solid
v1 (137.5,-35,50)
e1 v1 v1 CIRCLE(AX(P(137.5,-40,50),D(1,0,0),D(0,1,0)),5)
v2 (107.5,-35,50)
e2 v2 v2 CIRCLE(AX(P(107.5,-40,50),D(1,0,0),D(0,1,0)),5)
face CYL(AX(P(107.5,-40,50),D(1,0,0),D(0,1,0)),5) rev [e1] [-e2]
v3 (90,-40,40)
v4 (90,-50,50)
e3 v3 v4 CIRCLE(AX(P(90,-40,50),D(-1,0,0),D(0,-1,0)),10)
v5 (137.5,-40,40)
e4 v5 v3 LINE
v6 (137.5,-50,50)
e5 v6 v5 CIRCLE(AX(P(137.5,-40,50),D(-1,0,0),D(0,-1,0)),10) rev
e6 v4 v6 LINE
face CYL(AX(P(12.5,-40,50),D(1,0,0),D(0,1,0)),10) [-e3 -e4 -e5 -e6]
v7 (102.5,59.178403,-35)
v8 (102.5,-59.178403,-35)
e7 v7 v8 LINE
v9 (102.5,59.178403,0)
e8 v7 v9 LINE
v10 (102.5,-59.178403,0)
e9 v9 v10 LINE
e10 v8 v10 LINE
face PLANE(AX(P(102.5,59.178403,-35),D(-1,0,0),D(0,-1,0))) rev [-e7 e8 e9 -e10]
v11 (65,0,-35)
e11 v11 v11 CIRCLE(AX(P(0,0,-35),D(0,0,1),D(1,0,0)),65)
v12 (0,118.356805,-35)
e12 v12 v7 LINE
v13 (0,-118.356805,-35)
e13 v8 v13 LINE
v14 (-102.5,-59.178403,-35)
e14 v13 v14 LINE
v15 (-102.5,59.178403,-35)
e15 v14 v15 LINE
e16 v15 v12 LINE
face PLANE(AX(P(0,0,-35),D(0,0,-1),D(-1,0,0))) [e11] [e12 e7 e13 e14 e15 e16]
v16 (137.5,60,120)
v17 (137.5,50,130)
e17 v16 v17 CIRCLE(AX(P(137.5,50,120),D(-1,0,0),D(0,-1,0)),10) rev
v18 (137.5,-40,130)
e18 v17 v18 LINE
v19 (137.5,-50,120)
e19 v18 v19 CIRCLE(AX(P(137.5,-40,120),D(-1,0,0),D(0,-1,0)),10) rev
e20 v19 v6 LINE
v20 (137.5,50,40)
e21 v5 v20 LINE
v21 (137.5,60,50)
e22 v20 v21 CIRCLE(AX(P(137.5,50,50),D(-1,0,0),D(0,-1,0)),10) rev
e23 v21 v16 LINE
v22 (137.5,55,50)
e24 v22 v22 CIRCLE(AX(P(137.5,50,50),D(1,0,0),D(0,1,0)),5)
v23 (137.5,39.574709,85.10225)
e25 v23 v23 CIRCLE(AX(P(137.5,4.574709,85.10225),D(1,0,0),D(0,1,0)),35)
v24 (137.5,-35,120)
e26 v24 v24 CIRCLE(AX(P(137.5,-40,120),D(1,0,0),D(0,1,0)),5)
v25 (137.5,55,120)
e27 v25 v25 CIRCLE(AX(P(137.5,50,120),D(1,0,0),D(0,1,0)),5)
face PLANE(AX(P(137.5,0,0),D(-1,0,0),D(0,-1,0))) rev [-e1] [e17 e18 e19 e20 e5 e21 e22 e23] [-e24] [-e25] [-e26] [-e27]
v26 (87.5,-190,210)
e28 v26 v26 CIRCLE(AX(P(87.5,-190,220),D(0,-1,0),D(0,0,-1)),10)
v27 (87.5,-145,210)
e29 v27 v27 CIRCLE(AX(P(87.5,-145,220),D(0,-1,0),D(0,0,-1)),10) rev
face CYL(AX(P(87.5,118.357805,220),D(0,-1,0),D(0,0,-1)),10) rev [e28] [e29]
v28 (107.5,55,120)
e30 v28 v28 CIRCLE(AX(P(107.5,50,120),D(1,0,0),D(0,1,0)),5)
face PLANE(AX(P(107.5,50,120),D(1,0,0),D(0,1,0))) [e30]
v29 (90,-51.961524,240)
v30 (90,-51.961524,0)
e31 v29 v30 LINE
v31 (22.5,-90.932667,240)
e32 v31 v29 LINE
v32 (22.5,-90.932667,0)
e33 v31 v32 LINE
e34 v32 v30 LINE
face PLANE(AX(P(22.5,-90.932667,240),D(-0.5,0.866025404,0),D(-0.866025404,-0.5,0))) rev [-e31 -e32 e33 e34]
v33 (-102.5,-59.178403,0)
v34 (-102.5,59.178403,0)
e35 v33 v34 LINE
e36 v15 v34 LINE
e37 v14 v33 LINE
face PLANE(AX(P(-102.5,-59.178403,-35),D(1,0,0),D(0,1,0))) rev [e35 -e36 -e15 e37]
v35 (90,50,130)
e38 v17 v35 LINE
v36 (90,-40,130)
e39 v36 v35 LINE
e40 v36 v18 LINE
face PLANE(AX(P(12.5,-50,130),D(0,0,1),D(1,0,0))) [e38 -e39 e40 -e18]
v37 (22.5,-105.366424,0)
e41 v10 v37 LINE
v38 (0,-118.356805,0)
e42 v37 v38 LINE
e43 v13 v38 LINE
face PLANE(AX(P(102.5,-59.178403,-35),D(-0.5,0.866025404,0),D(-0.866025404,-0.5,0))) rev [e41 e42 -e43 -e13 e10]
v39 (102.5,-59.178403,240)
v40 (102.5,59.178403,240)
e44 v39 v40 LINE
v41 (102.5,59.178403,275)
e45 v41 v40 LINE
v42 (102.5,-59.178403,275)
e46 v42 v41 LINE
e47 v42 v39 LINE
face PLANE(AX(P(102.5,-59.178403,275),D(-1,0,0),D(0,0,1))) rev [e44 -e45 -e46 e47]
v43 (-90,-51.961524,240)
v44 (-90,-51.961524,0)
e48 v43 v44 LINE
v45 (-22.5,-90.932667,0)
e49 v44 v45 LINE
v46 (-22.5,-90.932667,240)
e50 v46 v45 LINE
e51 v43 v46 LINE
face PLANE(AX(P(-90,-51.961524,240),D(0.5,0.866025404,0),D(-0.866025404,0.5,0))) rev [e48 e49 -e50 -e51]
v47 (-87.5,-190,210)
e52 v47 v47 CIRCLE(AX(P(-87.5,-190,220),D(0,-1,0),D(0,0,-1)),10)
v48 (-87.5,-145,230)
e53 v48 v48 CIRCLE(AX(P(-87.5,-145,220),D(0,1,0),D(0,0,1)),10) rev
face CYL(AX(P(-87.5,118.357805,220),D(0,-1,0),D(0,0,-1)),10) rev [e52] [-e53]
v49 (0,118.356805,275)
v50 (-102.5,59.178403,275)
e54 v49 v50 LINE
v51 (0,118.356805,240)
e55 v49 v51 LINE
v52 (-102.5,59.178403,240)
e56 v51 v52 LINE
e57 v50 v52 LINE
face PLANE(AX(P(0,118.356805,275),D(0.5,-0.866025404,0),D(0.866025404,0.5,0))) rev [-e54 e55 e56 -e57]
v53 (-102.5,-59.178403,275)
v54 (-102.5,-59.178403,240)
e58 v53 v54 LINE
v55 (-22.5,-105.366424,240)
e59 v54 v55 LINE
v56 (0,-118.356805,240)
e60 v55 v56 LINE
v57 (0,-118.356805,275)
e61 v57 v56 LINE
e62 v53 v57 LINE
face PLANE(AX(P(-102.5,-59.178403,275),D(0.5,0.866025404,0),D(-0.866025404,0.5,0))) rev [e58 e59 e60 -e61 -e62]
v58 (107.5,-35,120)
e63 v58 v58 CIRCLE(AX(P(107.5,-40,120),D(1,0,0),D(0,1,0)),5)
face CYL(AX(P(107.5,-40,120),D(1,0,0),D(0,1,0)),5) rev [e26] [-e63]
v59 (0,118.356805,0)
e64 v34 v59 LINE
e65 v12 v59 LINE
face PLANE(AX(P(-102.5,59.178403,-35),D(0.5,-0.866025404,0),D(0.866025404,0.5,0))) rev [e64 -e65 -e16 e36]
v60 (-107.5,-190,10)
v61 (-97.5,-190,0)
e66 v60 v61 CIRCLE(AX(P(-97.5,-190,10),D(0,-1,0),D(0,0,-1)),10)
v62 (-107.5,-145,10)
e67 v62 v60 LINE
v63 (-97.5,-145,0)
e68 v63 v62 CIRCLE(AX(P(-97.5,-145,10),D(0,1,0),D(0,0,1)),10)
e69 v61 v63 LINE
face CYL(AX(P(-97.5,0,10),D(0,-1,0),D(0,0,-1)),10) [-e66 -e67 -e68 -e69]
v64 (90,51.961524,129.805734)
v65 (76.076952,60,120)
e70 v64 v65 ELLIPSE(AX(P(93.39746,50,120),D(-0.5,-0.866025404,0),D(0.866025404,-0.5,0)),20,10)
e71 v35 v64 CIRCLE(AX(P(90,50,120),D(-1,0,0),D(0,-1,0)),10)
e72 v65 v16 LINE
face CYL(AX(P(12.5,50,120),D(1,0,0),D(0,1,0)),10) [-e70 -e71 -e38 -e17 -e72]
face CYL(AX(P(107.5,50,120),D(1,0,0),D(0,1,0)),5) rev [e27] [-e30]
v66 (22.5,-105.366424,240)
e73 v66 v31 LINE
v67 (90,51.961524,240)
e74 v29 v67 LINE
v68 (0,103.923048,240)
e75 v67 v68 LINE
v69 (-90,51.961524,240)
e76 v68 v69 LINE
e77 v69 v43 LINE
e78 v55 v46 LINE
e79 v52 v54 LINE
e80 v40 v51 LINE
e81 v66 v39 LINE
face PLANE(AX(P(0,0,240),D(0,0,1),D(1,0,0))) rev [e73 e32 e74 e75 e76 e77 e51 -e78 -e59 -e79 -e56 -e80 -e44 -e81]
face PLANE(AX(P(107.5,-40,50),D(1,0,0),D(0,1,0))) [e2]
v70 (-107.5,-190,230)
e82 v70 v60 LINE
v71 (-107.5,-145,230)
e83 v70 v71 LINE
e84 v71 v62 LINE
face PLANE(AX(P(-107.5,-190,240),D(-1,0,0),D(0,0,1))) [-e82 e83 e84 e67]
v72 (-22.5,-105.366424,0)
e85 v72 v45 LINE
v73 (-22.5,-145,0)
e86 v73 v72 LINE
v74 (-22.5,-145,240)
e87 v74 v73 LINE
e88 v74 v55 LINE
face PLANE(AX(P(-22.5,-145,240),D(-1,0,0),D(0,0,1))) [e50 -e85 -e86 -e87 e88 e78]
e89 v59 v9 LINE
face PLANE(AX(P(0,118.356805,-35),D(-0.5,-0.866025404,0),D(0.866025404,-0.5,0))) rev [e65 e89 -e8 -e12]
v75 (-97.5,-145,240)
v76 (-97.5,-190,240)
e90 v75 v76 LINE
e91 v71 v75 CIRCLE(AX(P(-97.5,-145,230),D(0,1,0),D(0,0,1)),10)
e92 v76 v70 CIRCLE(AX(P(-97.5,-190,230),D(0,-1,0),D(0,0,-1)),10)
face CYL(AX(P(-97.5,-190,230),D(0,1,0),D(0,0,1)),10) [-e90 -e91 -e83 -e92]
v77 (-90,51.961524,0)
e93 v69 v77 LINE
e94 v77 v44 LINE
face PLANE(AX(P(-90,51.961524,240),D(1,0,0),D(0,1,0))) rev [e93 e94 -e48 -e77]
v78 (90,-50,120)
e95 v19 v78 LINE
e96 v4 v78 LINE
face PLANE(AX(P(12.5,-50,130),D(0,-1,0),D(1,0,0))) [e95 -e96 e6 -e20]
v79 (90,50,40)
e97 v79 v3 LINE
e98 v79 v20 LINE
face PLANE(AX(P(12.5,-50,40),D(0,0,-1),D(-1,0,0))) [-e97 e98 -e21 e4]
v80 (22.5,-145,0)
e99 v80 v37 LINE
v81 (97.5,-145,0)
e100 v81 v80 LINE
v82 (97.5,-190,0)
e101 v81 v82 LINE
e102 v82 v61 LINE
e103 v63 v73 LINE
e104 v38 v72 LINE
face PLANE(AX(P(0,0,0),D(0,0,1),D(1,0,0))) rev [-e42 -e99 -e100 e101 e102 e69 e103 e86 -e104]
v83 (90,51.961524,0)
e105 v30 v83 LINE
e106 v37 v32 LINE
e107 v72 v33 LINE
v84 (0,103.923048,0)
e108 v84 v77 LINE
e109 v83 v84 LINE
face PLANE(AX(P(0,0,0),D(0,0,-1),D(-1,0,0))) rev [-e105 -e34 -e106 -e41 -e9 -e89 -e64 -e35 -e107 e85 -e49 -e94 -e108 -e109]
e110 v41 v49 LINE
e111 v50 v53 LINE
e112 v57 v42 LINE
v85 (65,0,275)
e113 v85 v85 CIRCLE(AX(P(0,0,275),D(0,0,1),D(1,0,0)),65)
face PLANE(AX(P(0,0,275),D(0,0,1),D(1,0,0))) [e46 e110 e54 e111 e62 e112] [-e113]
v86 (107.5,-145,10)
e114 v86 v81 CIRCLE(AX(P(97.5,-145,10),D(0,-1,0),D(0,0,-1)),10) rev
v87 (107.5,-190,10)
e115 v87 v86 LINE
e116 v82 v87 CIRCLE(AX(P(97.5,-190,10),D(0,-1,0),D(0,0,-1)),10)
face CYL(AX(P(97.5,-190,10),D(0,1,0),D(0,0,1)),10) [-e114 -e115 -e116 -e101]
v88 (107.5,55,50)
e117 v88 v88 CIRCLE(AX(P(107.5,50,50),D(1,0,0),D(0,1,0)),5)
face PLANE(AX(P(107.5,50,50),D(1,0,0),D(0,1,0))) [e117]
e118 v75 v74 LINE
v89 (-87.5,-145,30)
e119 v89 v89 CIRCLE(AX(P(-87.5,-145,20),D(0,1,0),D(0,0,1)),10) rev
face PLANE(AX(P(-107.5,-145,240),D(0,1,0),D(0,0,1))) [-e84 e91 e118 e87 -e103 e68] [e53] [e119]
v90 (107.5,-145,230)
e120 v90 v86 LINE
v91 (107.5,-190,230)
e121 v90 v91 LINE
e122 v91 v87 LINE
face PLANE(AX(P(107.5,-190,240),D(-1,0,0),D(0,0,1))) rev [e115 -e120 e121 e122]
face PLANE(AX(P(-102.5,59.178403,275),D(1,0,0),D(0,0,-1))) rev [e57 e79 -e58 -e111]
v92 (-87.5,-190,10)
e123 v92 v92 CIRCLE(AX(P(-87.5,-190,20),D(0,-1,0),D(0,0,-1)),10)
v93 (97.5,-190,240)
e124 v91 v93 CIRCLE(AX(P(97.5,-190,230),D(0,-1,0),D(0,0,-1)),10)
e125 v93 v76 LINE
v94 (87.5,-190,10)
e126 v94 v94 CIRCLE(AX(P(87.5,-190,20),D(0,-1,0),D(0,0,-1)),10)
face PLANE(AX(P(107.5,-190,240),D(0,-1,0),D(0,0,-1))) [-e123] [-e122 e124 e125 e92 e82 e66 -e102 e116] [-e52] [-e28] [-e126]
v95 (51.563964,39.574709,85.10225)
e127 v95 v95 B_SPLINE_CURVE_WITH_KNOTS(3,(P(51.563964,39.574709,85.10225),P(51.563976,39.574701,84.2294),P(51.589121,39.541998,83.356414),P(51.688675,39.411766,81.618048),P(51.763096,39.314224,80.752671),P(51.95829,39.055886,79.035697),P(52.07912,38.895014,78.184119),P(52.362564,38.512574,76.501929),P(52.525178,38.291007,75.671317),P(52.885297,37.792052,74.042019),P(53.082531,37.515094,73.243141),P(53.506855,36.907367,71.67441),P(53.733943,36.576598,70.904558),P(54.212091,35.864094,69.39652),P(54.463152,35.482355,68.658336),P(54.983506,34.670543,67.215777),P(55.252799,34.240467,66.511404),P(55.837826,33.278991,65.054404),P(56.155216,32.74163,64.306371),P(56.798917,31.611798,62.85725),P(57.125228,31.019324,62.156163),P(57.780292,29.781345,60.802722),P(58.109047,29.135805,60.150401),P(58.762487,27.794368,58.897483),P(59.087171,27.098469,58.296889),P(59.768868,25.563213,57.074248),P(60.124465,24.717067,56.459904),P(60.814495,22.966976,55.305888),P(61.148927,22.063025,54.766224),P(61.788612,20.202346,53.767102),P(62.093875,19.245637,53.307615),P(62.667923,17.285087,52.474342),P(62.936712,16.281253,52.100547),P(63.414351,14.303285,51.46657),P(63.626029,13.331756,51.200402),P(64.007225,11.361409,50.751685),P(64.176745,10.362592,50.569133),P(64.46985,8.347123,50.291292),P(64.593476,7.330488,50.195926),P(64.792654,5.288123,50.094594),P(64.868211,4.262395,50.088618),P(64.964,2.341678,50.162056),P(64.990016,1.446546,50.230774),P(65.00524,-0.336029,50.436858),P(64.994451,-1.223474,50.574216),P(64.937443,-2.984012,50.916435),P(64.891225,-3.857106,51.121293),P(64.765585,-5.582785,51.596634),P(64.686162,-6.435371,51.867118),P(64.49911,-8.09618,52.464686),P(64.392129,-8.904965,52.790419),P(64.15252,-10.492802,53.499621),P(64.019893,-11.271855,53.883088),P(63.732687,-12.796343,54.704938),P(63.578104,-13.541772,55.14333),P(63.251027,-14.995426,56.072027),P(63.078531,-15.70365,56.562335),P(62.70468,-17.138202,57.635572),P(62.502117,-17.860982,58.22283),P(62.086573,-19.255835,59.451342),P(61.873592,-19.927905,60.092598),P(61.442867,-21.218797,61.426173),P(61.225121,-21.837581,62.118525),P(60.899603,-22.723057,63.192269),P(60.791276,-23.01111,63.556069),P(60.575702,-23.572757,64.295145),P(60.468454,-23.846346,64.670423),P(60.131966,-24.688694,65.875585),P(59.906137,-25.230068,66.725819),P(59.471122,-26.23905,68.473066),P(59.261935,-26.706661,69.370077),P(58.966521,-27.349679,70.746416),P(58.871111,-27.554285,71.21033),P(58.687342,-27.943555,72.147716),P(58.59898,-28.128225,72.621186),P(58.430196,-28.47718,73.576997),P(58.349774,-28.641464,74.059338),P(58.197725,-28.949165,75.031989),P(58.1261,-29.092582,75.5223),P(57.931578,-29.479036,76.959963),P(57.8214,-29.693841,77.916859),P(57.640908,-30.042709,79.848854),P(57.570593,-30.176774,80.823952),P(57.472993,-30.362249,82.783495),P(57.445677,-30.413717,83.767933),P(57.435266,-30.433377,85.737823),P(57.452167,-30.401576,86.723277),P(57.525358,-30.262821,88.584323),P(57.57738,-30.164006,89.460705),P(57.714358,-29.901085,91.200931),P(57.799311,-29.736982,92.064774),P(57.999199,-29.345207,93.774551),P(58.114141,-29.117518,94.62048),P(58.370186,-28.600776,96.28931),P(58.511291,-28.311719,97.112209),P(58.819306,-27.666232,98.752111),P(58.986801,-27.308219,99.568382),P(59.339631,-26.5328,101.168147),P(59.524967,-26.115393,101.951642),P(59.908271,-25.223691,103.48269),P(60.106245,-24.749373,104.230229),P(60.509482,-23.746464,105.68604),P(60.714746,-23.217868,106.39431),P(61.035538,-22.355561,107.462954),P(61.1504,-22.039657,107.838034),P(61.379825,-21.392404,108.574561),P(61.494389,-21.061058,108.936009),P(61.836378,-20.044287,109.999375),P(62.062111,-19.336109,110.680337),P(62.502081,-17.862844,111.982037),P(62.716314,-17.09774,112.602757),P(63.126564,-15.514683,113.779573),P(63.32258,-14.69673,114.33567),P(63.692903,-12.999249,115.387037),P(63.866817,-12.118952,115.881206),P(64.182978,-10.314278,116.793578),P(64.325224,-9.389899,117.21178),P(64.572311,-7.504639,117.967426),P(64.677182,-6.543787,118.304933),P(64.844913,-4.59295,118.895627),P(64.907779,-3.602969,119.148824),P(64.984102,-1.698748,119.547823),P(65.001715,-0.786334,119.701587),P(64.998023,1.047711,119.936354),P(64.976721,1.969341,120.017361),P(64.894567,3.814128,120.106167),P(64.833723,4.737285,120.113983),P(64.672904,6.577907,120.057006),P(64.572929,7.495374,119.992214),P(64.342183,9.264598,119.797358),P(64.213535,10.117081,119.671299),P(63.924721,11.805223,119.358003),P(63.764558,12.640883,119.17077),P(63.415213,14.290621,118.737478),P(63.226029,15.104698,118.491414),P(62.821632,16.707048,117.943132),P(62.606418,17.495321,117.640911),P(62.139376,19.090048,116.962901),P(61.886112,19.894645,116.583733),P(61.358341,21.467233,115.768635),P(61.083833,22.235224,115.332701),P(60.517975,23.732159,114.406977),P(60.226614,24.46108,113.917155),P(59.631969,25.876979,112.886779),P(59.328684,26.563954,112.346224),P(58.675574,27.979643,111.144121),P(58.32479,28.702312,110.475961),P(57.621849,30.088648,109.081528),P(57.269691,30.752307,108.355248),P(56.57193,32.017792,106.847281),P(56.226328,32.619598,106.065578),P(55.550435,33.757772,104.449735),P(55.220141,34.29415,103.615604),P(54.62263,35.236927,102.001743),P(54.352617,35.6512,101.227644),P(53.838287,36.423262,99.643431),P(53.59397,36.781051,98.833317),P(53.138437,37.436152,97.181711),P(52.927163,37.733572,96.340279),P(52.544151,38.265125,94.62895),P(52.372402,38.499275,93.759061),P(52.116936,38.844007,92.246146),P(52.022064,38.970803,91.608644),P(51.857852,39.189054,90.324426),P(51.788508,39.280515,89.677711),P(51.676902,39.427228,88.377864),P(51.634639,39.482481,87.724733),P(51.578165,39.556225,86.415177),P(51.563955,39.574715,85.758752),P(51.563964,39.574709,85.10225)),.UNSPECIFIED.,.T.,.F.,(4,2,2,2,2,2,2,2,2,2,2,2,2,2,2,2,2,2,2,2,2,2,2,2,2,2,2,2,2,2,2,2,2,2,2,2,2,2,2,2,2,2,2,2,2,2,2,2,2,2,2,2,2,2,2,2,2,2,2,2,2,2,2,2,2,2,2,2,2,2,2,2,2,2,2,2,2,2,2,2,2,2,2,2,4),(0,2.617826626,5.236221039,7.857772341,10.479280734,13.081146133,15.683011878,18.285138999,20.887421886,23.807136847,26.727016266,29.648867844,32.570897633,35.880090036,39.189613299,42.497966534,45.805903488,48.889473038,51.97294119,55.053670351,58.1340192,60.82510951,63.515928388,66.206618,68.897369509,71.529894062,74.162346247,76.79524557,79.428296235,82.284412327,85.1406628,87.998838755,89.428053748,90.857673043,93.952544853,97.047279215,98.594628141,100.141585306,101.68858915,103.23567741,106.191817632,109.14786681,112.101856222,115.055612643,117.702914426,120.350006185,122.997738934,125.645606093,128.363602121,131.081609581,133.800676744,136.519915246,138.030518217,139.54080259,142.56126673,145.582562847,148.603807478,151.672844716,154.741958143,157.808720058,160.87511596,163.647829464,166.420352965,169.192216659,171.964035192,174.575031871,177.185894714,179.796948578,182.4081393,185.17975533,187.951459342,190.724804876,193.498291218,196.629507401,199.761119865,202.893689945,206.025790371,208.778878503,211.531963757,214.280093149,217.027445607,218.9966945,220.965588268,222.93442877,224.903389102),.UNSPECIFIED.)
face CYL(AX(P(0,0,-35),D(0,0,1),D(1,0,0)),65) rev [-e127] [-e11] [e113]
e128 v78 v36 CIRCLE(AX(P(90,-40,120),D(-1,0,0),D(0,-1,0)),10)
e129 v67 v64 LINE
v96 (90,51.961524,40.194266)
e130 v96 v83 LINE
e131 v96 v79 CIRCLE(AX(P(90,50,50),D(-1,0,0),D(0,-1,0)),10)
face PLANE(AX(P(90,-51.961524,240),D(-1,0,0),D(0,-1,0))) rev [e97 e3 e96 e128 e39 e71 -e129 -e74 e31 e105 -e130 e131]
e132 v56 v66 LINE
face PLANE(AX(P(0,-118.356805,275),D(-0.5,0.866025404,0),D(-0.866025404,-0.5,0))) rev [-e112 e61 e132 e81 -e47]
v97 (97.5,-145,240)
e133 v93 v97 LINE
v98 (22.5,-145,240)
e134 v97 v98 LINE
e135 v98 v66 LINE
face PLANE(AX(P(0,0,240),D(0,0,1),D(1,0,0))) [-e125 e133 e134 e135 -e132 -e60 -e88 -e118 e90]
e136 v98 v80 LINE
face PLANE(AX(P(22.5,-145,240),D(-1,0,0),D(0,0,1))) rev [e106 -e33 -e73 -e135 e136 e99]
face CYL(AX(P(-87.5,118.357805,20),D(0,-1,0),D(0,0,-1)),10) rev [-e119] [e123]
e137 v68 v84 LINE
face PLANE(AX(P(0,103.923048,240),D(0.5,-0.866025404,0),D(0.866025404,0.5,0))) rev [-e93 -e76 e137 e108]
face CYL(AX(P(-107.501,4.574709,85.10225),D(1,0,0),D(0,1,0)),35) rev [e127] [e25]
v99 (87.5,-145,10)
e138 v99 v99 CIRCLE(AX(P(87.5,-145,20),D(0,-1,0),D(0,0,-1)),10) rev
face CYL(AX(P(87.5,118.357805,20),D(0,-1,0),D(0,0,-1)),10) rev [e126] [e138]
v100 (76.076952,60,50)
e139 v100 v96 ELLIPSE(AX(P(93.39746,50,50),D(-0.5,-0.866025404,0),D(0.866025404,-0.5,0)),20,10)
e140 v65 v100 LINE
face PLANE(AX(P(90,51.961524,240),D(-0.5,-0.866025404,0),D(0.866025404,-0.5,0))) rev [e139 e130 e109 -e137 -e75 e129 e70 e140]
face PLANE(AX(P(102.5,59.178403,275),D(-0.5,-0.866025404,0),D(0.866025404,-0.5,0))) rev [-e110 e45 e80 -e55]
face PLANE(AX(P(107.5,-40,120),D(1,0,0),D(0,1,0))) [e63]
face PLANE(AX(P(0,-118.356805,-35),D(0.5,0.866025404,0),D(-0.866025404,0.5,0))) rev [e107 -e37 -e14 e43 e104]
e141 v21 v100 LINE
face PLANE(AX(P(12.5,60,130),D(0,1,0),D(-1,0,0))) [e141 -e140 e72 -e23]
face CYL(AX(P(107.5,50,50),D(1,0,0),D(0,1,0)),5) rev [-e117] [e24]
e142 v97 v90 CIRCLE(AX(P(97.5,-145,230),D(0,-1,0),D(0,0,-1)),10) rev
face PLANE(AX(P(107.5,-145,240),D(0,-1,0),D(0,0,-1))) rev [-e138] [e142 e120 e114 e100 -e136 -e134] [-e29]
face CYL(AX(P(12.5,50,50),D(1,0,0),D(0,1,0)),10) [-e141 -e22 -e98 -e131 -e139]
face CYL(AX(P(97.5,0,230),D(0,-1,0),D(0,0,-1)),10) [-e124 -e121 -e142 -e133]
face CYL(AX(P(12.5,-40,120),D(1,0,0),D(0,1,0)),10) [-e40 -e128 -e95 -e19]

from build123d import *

# Parameters (mm, degrees)
EXTRUDE_1_DEPTH          = 240
EXTRUDE_2_DEPTH          = 35
EXTRUDE_3_DEPTH          = 35
EXTRUDE_5_DEPTH          = 35
EXTRUDE_5_DEPTH_BACK     = 90
SKETCH_9_W               = 90
SKETCH_9_H               = 110
SKETCH_10_R              = 65
CUT_EXTRUDE_1_DEPTH      = 389.72387372
CUT_EXTRUDE_2_REACH      = 416.427
CUT_EXTRUDE_2_END_RADIUS = 65
SKETCH_12_R              = 35
CUT_EXTRUDE_3_REACH      = 437.448
SKETCH_15_R              = 10
SKETCH_16_R              = 5
CUT_EXTRUDE_4_DEPTH      = 30
FILLET_13_R              = 10
FILLET_15_R              = 10


with BuildPart() as part:
    # Эскиз1 → Бобышка-Вытянуть1 (new body)
    with BuildSketch(Plane.XY):
        Polygon((0, 103.923048454), (-90, 51.961524227), (-90, -51.961524227), (-22.5, -90.932667397), (-22.5, -145), (-107.5, -145), (-107.5, -190), (107.5, -190), (107.5, -145), (22.5, -145), (22.5, -90.932667397), (90, -51.961524227), (90, 51.961524227), align=None)
    extrude(amount=EXTRUDE_1_DEPTH)

    # Эскиз2 → Бобышка-Вытянуть2 (add)
    with BuildSketch(Plane.XY.offset(240)):
        Polygon((0, 118.356805184), (-102.5, 59.178402592), (-102.5, -59.178402592), (0, -118.356805184), (102.5, -59.178402592), (102.5, 59.178402592), align=None)
    extrude(amount=EXTRUDE_2_DEPTH)

    # Эскиз6 → Бобышка-Вытянуть3 (add)
    with BuildSketch(Plane(origin=(0, 0, 0), x_dir=(-1, 0, 0), z_dir=(0, 0, -1))):
        Polygon((0, 118.356805184), (-102.5, 59.178402592), (-102.5, -59.178402592), (0, -118.356805184), (102.5, -59.178402592), (102.5, 59.178402592), align=None)
    extrude(amount=EXTRUDE_3_DEPTH)

    # Эскиз9 → Бобышка-Вытянуть5 (add, two sides: drawn at the far end of the back side and taken through both)
    with BuildSketch(Plane(origin=(102.5, 0, 0), x_dir=(0, 0, -1), z_dir=(1, 0, 0)).offset(-EXTRUDE_5_DEPTH_BACK)):
        with Locations((-85, 5)):
            Rectangle(SKETCH_9_W, SKETCH_9_H)
    extrude(amount=EXTRUDE_5_DEPTH + EXTRUDE_5_DEPTH_BACK)

    # Эскиз10 → Вырез-Вытянуть1 (cut, through all)
    with BuildSketch(Plane.XY.offset(275)):
        Circle(SKETCH_10_R)
    extrude(amount=-CUT_EXTRUDE_1_DEPTH, mode=Mode.SUBTRACT)

    # Вырез-Вытянуть2: up to this cylinder (the profile starts outside it)
    cut_extrude_2_end = Plane(origin=(0, 0, 85.10225), z_dir=(0, 0, 1)) * Cylinder(CUT_EXTRUDE_2_END_RADIUS, 963.854, mode=Mode.PRIVATE)
    # Эскиз12 → Вырез-Вытянуть2 (cut, up to the surface)
    with BuildSketch(Plane(origin=(137.5, 0, 0), x_dir=(0, 0, -1), z_dir=(1, 0, 0)), mode=Mode.PRIVATE) as cut_extrude_2_sk1:
        with Locations(Location((-85.102250197, 4.574709124, 0), (0, 0, 90))):
            Circle(SKETCH_12_R)
    cut_extrude_2_tool1 = extrude(cut_extrude_2_sk1.sketch, amount=-CUT_EXTRUDE_2_REACH, mode=Mode.PRIVATE) - cut_extrude_2_end
    add(cut_extrude_2_tool1.solids().sort_by_distance((137.5, 4.574709, 85.10225))[0], mode=Mode.SUBTRACT)

    # Эскиз15 → Вырез-Вытянуть3 (cut, up to next)
    with BuildSketch(Plane(origin=(0, -190, 0), x_dir=(-1, 0, 0), z_dir=(0, -1, 0)), mode=Mode.PRIVATE) as cut_extrude_3_sk1:
        with Locations(Location((87.5, -220, 0), (0, 0, 90))):
            Circle(SKETCH_15_R)
    cut_extrude_3_tool1 = extrude(cut_extrude_3_sk1.sketch, amount=-CUT_EXTRUDE_3_REACH, mode=Mode.PRIVATE) & part.part
    # Эскиз15 → Вырез-Вытянуть3 (cut, up to next)
    with BuildSketch(Plane(origin=(0, -190, 0), x_dir=(-1, 0, 0), z_dir=(0, -1, 0)), mode=Mode.PRIVATE) as cut_extrude_3_sk2:
        with Locations(Location((-87.5, -220, 0), (0, 0, 90))):
            Circle(SKETCH_15_R)
    cut_extrude_3_tool2 = extrude(cut_extrude_3_sk2.sketch, amount=-CUT_EXTRUDE_3_REACH, mode=Mode.PRIVATE) & part.part
    # Эскиз15 → Вырез-Вытянуть3 (cut, up to next)
    with BuildSketch(Plane(origin=(0, -190, 0), x_dir=(-1, 0, 0), z_dir=(0, -1, 0)), mode=Mode.PRIVATE) as cut_extrude_3_sk3:
        with Locations(Location((-87.5, -20, 0), (0, 0, 90))):
            Circle(SKETCH_15_R)
    cut_extrude_3_tool3 = extrude(cut_extrude_3_sk3.sketch, amount=-CUT_EXTRUDE_3_REACH, mode=Mode.PRIVATE) & part.part
    # Эскиз15 → Вырез-Вытянуть3 (cut, up to next)
    with BuildSketch(Plane(origin=(0, -190, 0), x_dir=(-1, 0, 0), z_dir=(0, -1, 0)), mode=Mode.PRIVATE) as cut_extrude_3_sk4:
        with Locations(Location((87.5, -20, 0), (0, 0, 90))):
            Circle(SKETCH_15_R)
    cut_extrude_3_tool4 = extrude(cut_extrude_3_sk4.sketch, amount=-CUT_EXTRUDE_3_REACH, mode=Mode.PRIVATE) & part.part
    add(cut_extrude_3_tool1.solids().sort_by_distance((-87.5, -190, 220))[0], mode=Mode.SUBTRACT)
    add(cut_extrude_3_tool2.solids().sort_by_distance((87.5, -190, 220))[0], mode=Mode.SUBTRACT)
    add(cut_extrude_3_tool3.solids().sort_by_distance((87.5, -190, 20))[0], mode=Mode.SUBTRACT)
    add(cut_extrude_3_tool4.solids().sort_by_distance((-87.5, -190, 20))[0], mode=Mode.SUBTRACT)

    # Эскиз16 → Вырез-Вытянуть4 (cut)
    with BuildSketch(Plane(origin=(137.5, 0, 0), x_dir=(0, 0, -1), z_dir=(1, 0, 0))):
        with Locations(Location((-120, 50, 0), (0, 0, 90))):
            Circle(SKETCH_16_R)
        with Locations(Location((-50, 50, 0), (0, 0, 90))):
            Circle(SKETCH_16_R)
        with Locations(Location((-120, -40, 0), (0, 0, 90))):
            Circle(SKETCH_16_R)
        with Locations(Location((-50, -40, 0), (0, 0, 90))):
            Circle(SKETCH_16_R)
    extrude(amount=-CUT_EXTRUDE_4_DEPTH, mode=Mode.SUBTRACT)

    # Скругление13
    # the kernel refuses this fillet: 10 mm, written as the material it takes off along each edge
    with BuildSketch(Plane(origin=(51.076951546, 60, 40), x_dir=(0, 0, 1), z_dir=(1, 0, 0))) as fillet_13_piece_1_section:
        with BuildLine():
            CenterArc((FILLET_13_R, FILLET_13_R), FILLET_13_R, 180, 90)
            Line((0, FILLET_13_R), (0, 0))
            Line((0, 0), (FILLET_13_R, 0))
        make_face()
    fillet_13_piece_1 = extrude(amount=111.423048454, mode=Mode.PRIVATE)
    fillet_13_piece_1 = split(fillet_13_piece_1, bisect_by=Plane(origin=(91.336979789, 51.189618586, 39.919231597), z_dir=(-0.5000000000000002, -0.8660254037844386, 0)), keep=Keep.TOP, mode=Mode.PRIVATE)
    fillet_13_piece_1 = split(fillet_13_piece_1, bisect_by=Plane(origin=(90, 50.726475201, 39.919231597), z_dir=(1, 0, 0)), keep=Keep.TOP, mode=Mode.PRIVATE)
    add(fillet_13_piece_1, mode=Mode.SUBTRACT)
    with BuildSketch(Plane(origin=(51.076951546, 60, 40), x_dir=(0, 0, 1), z_dir=(1, 0, 0))) as fillet_13_piece_2_section:
        with BuildLine():
            CenterArc((FILLET_13_R, FILLET_13_R), FILLET_13_R, 180, 90)
            Line((0, FILLET_13_R), (0, 0))
            Line((0, 0), (FILLET_13_R, 0))
        make_face()
    fillet_13_piece_2 = extrude(amount=111.423048454, mode=Mode.PRIVATE)
    fillet_13_piece_2 = split(fillet_13_piece_2, bisect_by=Plane(origin=(82.903194499, 56.058866794, 42.730902083), z_dir=(0.5000000000000002, 0.8660254037844386, 0)), keep=Keep.TOP, mode=Mode.PRIVATE)
    fillet_13_piece_2 = split(fillet_13_piece_2, bisect_by=Plane(origin=(90, 58.517272333, 42.730902083), z_dir=(-1, 0, 0)), keep=Keep.TOP, mode=Mode.PRIVATE)
    add(fillet_13_piece_2, mode=Mode.SUBTRACT)
    with BuildSketch(Plane(origin=(51.076951546, 60, 40), x_dir=(0, 0, 1), z_dir=(1, 0, 0))) as fillet_13_piece_3_section:
        with BuildLine():
            CenterArc((FILLET_13_R, FILLET_13_R), FILLET_13_R, 180, 90)
            Line((0, FILLET_13_R), (0, 0))
            Line((0, 0), (FILLET_13_R, 0))
        make_face()
    fillet_13_piece_3 = extrude(amount=111.423048454, mode=Mode.PRIVATE)
    fillet_13_piece_3 = split(fillet_13_piece_3, bisect_by=Plane(origin=(114.69683315, 37.70280096, 42.264932775), z_dir=(0.5000000000000002, 0.8660254037844386, 0)), keep=Keep.TOP, mode=Mode.PRIVATE)
    fillet_13_piece_3 = split(fillet_13_piece_3, bisect_by=Plane(origin=(90, 57.738983461, 42.264932775), z_dir=(1, 0, 0)), keep=Keep.TOP, mode=Mode.PRIVATE)
    add(fillet_13_piece_3, mode=Mode.SUBTRACT)
    with BuildSketch(Plane(origin=(162.5, 60, 130), x_dir=(0, -1, 0), z_dir=(-1, 0, 0))) as fillet_13_piece_4_section:
        with BuildLine():
            CenterArc((FILLET_13_R, -FILLET_13_R), FILLET_13_R, 90, 90)
            Line((0, -FILLET_13_R), (0, 0))
            Line((0, 0), (FILLET_13_R, 0))
        make_face()
    fillet_13_piece_4 = extrude(amount=111.423048454, mode=Mode.PRIVATE)
    fillet_13_piece_4 = split(fillet_13_piece_4, bisect_by=Plane(origin=(114.69683315, 37.70280096, 127.735067225), z_dir=(0.5000000000000002, 0.8660254037844386, 0)), keep=Keep.TOP, mode=Mode.PRIVATE)
    fillet_13_piece_4 = split(fillet_13_piece_4, bisect_by=Plane(origin=(90, 57.738983461, 127.735067225), z_dir=(1, 0, 0)), keep=Keep.TOP, mode=Mode.PRIVATE)
    add(fillet_13_piece_4, mode=Mode.SUBTRACT)
    with BuildSketch(Plane(origin=(162.5, 60, 130), x_dir=(0, -1, 0), z_dir=(-1, 0, 0))) as fillet_13_piece_5_section:
        with BuildLine():
            CenterArc((FILLET_13_R, -FILLET_13_R), FILLET_13_R, 90, 90)
            Line((0, -FILLET_13_R), (0, 0))
            Line((0, 0), (FILLET_13_R, 0))
        make_face()
    fillet_13_piece_5 = extrude(amount=111.423048454, mode=Mode.PRIVATE)
    fillet_13_piece_5 = split(fillet_13_piece_5, bisect_by=Plane(origin=(82.903194499, 56.058866793, 127.269097917), z_dir=(0.5000000000000002, 0.8660254037844386, 0)), keep=Keep.TOP, mode=Mode.PRIVATE)
    fillet_13_piece_5 = split(fillet_13_piece_5, bisect_by=Plane(origin=(90, 58.517272333, 127.269097917), z_dir=(-1, 0, 0)), keep=Keep.TOP, mode=Mode.PRIVATE)
    add(fillet_13_piece_5, mode=Mode.SUBTRACT)
    with BuildSketch(Plane(origin=(162.5, 60, 130), x_dir=(0, -1, 0), z_dir=(-1, 0, 0))) as fillet_13_piece_6_section:
        with BuildLine():
            CenterArc((FILLET_13_R, -FILLET_13_R), FILLET_13_R, 90, 90)
            Line((0, -FILLET_13_R), (0, 0))
            Line((0, 0), (FILLET_13_R, 0))
        make_face()
    fillet_13_piece_6 = extrude(amount=111.423048454, mode=Mode.PRIVATE)
    fillet_13_piece_6 = split(fillet_13_piece_6, bisect_by=Plane(origin=(91.336979789, 51.189618586, 130.080768403), z_dir=(-0.5000000000000002, -0.8660254037844386, 0)), keep=Keep.TOP, mode=Mode.PRIVATE)
    fillet_13_piece_6 = split(fillet_13_piece_6, bisect_by=Plane(origin=(90, 50.726475201, 130.080768403), z_dir=(1, 0, 0)), keep=Keep.TOP, mode=Mode.PRIVATE)
    add(fillet_13_piece_6, mode=Mode.SUBTRACT)
    with BuildSketch(Plane(origin=(90, -50, 40), x_dir=(0, 1, 0), z_dir=(1, 0, 0)), Plane(origin=(162.5, -50, 130), x_dir=(0, 1, 0), z_dir=(-1, 0, 0))) as fillet_13_piece_7:
        with BuildLine():
            CenterArc((FILLET_13_R, FILLET_13_R), FILLET_13_R, 180, 90)
            Line((0, FILLET_13_R), (0, 0))
            Line((0, 0), (FILLET_13_R, 0))
        make_face()
    extrude(amount=72.5, mode=Mode.SUBTRACT)

    # Скругление15
    fillet_15_edges = [part.edges().sort_by_distance(p)[0] for p in [
        (107.5, -167.5, 0),
        (-107.5, -167.5, 0),
        (-107.5, -167.5, 240),
        (107.5, -167.5, 240),
    ]]
    fillet(fillet_15_edges, radius=FILLET_15_R)


solid = part.part
